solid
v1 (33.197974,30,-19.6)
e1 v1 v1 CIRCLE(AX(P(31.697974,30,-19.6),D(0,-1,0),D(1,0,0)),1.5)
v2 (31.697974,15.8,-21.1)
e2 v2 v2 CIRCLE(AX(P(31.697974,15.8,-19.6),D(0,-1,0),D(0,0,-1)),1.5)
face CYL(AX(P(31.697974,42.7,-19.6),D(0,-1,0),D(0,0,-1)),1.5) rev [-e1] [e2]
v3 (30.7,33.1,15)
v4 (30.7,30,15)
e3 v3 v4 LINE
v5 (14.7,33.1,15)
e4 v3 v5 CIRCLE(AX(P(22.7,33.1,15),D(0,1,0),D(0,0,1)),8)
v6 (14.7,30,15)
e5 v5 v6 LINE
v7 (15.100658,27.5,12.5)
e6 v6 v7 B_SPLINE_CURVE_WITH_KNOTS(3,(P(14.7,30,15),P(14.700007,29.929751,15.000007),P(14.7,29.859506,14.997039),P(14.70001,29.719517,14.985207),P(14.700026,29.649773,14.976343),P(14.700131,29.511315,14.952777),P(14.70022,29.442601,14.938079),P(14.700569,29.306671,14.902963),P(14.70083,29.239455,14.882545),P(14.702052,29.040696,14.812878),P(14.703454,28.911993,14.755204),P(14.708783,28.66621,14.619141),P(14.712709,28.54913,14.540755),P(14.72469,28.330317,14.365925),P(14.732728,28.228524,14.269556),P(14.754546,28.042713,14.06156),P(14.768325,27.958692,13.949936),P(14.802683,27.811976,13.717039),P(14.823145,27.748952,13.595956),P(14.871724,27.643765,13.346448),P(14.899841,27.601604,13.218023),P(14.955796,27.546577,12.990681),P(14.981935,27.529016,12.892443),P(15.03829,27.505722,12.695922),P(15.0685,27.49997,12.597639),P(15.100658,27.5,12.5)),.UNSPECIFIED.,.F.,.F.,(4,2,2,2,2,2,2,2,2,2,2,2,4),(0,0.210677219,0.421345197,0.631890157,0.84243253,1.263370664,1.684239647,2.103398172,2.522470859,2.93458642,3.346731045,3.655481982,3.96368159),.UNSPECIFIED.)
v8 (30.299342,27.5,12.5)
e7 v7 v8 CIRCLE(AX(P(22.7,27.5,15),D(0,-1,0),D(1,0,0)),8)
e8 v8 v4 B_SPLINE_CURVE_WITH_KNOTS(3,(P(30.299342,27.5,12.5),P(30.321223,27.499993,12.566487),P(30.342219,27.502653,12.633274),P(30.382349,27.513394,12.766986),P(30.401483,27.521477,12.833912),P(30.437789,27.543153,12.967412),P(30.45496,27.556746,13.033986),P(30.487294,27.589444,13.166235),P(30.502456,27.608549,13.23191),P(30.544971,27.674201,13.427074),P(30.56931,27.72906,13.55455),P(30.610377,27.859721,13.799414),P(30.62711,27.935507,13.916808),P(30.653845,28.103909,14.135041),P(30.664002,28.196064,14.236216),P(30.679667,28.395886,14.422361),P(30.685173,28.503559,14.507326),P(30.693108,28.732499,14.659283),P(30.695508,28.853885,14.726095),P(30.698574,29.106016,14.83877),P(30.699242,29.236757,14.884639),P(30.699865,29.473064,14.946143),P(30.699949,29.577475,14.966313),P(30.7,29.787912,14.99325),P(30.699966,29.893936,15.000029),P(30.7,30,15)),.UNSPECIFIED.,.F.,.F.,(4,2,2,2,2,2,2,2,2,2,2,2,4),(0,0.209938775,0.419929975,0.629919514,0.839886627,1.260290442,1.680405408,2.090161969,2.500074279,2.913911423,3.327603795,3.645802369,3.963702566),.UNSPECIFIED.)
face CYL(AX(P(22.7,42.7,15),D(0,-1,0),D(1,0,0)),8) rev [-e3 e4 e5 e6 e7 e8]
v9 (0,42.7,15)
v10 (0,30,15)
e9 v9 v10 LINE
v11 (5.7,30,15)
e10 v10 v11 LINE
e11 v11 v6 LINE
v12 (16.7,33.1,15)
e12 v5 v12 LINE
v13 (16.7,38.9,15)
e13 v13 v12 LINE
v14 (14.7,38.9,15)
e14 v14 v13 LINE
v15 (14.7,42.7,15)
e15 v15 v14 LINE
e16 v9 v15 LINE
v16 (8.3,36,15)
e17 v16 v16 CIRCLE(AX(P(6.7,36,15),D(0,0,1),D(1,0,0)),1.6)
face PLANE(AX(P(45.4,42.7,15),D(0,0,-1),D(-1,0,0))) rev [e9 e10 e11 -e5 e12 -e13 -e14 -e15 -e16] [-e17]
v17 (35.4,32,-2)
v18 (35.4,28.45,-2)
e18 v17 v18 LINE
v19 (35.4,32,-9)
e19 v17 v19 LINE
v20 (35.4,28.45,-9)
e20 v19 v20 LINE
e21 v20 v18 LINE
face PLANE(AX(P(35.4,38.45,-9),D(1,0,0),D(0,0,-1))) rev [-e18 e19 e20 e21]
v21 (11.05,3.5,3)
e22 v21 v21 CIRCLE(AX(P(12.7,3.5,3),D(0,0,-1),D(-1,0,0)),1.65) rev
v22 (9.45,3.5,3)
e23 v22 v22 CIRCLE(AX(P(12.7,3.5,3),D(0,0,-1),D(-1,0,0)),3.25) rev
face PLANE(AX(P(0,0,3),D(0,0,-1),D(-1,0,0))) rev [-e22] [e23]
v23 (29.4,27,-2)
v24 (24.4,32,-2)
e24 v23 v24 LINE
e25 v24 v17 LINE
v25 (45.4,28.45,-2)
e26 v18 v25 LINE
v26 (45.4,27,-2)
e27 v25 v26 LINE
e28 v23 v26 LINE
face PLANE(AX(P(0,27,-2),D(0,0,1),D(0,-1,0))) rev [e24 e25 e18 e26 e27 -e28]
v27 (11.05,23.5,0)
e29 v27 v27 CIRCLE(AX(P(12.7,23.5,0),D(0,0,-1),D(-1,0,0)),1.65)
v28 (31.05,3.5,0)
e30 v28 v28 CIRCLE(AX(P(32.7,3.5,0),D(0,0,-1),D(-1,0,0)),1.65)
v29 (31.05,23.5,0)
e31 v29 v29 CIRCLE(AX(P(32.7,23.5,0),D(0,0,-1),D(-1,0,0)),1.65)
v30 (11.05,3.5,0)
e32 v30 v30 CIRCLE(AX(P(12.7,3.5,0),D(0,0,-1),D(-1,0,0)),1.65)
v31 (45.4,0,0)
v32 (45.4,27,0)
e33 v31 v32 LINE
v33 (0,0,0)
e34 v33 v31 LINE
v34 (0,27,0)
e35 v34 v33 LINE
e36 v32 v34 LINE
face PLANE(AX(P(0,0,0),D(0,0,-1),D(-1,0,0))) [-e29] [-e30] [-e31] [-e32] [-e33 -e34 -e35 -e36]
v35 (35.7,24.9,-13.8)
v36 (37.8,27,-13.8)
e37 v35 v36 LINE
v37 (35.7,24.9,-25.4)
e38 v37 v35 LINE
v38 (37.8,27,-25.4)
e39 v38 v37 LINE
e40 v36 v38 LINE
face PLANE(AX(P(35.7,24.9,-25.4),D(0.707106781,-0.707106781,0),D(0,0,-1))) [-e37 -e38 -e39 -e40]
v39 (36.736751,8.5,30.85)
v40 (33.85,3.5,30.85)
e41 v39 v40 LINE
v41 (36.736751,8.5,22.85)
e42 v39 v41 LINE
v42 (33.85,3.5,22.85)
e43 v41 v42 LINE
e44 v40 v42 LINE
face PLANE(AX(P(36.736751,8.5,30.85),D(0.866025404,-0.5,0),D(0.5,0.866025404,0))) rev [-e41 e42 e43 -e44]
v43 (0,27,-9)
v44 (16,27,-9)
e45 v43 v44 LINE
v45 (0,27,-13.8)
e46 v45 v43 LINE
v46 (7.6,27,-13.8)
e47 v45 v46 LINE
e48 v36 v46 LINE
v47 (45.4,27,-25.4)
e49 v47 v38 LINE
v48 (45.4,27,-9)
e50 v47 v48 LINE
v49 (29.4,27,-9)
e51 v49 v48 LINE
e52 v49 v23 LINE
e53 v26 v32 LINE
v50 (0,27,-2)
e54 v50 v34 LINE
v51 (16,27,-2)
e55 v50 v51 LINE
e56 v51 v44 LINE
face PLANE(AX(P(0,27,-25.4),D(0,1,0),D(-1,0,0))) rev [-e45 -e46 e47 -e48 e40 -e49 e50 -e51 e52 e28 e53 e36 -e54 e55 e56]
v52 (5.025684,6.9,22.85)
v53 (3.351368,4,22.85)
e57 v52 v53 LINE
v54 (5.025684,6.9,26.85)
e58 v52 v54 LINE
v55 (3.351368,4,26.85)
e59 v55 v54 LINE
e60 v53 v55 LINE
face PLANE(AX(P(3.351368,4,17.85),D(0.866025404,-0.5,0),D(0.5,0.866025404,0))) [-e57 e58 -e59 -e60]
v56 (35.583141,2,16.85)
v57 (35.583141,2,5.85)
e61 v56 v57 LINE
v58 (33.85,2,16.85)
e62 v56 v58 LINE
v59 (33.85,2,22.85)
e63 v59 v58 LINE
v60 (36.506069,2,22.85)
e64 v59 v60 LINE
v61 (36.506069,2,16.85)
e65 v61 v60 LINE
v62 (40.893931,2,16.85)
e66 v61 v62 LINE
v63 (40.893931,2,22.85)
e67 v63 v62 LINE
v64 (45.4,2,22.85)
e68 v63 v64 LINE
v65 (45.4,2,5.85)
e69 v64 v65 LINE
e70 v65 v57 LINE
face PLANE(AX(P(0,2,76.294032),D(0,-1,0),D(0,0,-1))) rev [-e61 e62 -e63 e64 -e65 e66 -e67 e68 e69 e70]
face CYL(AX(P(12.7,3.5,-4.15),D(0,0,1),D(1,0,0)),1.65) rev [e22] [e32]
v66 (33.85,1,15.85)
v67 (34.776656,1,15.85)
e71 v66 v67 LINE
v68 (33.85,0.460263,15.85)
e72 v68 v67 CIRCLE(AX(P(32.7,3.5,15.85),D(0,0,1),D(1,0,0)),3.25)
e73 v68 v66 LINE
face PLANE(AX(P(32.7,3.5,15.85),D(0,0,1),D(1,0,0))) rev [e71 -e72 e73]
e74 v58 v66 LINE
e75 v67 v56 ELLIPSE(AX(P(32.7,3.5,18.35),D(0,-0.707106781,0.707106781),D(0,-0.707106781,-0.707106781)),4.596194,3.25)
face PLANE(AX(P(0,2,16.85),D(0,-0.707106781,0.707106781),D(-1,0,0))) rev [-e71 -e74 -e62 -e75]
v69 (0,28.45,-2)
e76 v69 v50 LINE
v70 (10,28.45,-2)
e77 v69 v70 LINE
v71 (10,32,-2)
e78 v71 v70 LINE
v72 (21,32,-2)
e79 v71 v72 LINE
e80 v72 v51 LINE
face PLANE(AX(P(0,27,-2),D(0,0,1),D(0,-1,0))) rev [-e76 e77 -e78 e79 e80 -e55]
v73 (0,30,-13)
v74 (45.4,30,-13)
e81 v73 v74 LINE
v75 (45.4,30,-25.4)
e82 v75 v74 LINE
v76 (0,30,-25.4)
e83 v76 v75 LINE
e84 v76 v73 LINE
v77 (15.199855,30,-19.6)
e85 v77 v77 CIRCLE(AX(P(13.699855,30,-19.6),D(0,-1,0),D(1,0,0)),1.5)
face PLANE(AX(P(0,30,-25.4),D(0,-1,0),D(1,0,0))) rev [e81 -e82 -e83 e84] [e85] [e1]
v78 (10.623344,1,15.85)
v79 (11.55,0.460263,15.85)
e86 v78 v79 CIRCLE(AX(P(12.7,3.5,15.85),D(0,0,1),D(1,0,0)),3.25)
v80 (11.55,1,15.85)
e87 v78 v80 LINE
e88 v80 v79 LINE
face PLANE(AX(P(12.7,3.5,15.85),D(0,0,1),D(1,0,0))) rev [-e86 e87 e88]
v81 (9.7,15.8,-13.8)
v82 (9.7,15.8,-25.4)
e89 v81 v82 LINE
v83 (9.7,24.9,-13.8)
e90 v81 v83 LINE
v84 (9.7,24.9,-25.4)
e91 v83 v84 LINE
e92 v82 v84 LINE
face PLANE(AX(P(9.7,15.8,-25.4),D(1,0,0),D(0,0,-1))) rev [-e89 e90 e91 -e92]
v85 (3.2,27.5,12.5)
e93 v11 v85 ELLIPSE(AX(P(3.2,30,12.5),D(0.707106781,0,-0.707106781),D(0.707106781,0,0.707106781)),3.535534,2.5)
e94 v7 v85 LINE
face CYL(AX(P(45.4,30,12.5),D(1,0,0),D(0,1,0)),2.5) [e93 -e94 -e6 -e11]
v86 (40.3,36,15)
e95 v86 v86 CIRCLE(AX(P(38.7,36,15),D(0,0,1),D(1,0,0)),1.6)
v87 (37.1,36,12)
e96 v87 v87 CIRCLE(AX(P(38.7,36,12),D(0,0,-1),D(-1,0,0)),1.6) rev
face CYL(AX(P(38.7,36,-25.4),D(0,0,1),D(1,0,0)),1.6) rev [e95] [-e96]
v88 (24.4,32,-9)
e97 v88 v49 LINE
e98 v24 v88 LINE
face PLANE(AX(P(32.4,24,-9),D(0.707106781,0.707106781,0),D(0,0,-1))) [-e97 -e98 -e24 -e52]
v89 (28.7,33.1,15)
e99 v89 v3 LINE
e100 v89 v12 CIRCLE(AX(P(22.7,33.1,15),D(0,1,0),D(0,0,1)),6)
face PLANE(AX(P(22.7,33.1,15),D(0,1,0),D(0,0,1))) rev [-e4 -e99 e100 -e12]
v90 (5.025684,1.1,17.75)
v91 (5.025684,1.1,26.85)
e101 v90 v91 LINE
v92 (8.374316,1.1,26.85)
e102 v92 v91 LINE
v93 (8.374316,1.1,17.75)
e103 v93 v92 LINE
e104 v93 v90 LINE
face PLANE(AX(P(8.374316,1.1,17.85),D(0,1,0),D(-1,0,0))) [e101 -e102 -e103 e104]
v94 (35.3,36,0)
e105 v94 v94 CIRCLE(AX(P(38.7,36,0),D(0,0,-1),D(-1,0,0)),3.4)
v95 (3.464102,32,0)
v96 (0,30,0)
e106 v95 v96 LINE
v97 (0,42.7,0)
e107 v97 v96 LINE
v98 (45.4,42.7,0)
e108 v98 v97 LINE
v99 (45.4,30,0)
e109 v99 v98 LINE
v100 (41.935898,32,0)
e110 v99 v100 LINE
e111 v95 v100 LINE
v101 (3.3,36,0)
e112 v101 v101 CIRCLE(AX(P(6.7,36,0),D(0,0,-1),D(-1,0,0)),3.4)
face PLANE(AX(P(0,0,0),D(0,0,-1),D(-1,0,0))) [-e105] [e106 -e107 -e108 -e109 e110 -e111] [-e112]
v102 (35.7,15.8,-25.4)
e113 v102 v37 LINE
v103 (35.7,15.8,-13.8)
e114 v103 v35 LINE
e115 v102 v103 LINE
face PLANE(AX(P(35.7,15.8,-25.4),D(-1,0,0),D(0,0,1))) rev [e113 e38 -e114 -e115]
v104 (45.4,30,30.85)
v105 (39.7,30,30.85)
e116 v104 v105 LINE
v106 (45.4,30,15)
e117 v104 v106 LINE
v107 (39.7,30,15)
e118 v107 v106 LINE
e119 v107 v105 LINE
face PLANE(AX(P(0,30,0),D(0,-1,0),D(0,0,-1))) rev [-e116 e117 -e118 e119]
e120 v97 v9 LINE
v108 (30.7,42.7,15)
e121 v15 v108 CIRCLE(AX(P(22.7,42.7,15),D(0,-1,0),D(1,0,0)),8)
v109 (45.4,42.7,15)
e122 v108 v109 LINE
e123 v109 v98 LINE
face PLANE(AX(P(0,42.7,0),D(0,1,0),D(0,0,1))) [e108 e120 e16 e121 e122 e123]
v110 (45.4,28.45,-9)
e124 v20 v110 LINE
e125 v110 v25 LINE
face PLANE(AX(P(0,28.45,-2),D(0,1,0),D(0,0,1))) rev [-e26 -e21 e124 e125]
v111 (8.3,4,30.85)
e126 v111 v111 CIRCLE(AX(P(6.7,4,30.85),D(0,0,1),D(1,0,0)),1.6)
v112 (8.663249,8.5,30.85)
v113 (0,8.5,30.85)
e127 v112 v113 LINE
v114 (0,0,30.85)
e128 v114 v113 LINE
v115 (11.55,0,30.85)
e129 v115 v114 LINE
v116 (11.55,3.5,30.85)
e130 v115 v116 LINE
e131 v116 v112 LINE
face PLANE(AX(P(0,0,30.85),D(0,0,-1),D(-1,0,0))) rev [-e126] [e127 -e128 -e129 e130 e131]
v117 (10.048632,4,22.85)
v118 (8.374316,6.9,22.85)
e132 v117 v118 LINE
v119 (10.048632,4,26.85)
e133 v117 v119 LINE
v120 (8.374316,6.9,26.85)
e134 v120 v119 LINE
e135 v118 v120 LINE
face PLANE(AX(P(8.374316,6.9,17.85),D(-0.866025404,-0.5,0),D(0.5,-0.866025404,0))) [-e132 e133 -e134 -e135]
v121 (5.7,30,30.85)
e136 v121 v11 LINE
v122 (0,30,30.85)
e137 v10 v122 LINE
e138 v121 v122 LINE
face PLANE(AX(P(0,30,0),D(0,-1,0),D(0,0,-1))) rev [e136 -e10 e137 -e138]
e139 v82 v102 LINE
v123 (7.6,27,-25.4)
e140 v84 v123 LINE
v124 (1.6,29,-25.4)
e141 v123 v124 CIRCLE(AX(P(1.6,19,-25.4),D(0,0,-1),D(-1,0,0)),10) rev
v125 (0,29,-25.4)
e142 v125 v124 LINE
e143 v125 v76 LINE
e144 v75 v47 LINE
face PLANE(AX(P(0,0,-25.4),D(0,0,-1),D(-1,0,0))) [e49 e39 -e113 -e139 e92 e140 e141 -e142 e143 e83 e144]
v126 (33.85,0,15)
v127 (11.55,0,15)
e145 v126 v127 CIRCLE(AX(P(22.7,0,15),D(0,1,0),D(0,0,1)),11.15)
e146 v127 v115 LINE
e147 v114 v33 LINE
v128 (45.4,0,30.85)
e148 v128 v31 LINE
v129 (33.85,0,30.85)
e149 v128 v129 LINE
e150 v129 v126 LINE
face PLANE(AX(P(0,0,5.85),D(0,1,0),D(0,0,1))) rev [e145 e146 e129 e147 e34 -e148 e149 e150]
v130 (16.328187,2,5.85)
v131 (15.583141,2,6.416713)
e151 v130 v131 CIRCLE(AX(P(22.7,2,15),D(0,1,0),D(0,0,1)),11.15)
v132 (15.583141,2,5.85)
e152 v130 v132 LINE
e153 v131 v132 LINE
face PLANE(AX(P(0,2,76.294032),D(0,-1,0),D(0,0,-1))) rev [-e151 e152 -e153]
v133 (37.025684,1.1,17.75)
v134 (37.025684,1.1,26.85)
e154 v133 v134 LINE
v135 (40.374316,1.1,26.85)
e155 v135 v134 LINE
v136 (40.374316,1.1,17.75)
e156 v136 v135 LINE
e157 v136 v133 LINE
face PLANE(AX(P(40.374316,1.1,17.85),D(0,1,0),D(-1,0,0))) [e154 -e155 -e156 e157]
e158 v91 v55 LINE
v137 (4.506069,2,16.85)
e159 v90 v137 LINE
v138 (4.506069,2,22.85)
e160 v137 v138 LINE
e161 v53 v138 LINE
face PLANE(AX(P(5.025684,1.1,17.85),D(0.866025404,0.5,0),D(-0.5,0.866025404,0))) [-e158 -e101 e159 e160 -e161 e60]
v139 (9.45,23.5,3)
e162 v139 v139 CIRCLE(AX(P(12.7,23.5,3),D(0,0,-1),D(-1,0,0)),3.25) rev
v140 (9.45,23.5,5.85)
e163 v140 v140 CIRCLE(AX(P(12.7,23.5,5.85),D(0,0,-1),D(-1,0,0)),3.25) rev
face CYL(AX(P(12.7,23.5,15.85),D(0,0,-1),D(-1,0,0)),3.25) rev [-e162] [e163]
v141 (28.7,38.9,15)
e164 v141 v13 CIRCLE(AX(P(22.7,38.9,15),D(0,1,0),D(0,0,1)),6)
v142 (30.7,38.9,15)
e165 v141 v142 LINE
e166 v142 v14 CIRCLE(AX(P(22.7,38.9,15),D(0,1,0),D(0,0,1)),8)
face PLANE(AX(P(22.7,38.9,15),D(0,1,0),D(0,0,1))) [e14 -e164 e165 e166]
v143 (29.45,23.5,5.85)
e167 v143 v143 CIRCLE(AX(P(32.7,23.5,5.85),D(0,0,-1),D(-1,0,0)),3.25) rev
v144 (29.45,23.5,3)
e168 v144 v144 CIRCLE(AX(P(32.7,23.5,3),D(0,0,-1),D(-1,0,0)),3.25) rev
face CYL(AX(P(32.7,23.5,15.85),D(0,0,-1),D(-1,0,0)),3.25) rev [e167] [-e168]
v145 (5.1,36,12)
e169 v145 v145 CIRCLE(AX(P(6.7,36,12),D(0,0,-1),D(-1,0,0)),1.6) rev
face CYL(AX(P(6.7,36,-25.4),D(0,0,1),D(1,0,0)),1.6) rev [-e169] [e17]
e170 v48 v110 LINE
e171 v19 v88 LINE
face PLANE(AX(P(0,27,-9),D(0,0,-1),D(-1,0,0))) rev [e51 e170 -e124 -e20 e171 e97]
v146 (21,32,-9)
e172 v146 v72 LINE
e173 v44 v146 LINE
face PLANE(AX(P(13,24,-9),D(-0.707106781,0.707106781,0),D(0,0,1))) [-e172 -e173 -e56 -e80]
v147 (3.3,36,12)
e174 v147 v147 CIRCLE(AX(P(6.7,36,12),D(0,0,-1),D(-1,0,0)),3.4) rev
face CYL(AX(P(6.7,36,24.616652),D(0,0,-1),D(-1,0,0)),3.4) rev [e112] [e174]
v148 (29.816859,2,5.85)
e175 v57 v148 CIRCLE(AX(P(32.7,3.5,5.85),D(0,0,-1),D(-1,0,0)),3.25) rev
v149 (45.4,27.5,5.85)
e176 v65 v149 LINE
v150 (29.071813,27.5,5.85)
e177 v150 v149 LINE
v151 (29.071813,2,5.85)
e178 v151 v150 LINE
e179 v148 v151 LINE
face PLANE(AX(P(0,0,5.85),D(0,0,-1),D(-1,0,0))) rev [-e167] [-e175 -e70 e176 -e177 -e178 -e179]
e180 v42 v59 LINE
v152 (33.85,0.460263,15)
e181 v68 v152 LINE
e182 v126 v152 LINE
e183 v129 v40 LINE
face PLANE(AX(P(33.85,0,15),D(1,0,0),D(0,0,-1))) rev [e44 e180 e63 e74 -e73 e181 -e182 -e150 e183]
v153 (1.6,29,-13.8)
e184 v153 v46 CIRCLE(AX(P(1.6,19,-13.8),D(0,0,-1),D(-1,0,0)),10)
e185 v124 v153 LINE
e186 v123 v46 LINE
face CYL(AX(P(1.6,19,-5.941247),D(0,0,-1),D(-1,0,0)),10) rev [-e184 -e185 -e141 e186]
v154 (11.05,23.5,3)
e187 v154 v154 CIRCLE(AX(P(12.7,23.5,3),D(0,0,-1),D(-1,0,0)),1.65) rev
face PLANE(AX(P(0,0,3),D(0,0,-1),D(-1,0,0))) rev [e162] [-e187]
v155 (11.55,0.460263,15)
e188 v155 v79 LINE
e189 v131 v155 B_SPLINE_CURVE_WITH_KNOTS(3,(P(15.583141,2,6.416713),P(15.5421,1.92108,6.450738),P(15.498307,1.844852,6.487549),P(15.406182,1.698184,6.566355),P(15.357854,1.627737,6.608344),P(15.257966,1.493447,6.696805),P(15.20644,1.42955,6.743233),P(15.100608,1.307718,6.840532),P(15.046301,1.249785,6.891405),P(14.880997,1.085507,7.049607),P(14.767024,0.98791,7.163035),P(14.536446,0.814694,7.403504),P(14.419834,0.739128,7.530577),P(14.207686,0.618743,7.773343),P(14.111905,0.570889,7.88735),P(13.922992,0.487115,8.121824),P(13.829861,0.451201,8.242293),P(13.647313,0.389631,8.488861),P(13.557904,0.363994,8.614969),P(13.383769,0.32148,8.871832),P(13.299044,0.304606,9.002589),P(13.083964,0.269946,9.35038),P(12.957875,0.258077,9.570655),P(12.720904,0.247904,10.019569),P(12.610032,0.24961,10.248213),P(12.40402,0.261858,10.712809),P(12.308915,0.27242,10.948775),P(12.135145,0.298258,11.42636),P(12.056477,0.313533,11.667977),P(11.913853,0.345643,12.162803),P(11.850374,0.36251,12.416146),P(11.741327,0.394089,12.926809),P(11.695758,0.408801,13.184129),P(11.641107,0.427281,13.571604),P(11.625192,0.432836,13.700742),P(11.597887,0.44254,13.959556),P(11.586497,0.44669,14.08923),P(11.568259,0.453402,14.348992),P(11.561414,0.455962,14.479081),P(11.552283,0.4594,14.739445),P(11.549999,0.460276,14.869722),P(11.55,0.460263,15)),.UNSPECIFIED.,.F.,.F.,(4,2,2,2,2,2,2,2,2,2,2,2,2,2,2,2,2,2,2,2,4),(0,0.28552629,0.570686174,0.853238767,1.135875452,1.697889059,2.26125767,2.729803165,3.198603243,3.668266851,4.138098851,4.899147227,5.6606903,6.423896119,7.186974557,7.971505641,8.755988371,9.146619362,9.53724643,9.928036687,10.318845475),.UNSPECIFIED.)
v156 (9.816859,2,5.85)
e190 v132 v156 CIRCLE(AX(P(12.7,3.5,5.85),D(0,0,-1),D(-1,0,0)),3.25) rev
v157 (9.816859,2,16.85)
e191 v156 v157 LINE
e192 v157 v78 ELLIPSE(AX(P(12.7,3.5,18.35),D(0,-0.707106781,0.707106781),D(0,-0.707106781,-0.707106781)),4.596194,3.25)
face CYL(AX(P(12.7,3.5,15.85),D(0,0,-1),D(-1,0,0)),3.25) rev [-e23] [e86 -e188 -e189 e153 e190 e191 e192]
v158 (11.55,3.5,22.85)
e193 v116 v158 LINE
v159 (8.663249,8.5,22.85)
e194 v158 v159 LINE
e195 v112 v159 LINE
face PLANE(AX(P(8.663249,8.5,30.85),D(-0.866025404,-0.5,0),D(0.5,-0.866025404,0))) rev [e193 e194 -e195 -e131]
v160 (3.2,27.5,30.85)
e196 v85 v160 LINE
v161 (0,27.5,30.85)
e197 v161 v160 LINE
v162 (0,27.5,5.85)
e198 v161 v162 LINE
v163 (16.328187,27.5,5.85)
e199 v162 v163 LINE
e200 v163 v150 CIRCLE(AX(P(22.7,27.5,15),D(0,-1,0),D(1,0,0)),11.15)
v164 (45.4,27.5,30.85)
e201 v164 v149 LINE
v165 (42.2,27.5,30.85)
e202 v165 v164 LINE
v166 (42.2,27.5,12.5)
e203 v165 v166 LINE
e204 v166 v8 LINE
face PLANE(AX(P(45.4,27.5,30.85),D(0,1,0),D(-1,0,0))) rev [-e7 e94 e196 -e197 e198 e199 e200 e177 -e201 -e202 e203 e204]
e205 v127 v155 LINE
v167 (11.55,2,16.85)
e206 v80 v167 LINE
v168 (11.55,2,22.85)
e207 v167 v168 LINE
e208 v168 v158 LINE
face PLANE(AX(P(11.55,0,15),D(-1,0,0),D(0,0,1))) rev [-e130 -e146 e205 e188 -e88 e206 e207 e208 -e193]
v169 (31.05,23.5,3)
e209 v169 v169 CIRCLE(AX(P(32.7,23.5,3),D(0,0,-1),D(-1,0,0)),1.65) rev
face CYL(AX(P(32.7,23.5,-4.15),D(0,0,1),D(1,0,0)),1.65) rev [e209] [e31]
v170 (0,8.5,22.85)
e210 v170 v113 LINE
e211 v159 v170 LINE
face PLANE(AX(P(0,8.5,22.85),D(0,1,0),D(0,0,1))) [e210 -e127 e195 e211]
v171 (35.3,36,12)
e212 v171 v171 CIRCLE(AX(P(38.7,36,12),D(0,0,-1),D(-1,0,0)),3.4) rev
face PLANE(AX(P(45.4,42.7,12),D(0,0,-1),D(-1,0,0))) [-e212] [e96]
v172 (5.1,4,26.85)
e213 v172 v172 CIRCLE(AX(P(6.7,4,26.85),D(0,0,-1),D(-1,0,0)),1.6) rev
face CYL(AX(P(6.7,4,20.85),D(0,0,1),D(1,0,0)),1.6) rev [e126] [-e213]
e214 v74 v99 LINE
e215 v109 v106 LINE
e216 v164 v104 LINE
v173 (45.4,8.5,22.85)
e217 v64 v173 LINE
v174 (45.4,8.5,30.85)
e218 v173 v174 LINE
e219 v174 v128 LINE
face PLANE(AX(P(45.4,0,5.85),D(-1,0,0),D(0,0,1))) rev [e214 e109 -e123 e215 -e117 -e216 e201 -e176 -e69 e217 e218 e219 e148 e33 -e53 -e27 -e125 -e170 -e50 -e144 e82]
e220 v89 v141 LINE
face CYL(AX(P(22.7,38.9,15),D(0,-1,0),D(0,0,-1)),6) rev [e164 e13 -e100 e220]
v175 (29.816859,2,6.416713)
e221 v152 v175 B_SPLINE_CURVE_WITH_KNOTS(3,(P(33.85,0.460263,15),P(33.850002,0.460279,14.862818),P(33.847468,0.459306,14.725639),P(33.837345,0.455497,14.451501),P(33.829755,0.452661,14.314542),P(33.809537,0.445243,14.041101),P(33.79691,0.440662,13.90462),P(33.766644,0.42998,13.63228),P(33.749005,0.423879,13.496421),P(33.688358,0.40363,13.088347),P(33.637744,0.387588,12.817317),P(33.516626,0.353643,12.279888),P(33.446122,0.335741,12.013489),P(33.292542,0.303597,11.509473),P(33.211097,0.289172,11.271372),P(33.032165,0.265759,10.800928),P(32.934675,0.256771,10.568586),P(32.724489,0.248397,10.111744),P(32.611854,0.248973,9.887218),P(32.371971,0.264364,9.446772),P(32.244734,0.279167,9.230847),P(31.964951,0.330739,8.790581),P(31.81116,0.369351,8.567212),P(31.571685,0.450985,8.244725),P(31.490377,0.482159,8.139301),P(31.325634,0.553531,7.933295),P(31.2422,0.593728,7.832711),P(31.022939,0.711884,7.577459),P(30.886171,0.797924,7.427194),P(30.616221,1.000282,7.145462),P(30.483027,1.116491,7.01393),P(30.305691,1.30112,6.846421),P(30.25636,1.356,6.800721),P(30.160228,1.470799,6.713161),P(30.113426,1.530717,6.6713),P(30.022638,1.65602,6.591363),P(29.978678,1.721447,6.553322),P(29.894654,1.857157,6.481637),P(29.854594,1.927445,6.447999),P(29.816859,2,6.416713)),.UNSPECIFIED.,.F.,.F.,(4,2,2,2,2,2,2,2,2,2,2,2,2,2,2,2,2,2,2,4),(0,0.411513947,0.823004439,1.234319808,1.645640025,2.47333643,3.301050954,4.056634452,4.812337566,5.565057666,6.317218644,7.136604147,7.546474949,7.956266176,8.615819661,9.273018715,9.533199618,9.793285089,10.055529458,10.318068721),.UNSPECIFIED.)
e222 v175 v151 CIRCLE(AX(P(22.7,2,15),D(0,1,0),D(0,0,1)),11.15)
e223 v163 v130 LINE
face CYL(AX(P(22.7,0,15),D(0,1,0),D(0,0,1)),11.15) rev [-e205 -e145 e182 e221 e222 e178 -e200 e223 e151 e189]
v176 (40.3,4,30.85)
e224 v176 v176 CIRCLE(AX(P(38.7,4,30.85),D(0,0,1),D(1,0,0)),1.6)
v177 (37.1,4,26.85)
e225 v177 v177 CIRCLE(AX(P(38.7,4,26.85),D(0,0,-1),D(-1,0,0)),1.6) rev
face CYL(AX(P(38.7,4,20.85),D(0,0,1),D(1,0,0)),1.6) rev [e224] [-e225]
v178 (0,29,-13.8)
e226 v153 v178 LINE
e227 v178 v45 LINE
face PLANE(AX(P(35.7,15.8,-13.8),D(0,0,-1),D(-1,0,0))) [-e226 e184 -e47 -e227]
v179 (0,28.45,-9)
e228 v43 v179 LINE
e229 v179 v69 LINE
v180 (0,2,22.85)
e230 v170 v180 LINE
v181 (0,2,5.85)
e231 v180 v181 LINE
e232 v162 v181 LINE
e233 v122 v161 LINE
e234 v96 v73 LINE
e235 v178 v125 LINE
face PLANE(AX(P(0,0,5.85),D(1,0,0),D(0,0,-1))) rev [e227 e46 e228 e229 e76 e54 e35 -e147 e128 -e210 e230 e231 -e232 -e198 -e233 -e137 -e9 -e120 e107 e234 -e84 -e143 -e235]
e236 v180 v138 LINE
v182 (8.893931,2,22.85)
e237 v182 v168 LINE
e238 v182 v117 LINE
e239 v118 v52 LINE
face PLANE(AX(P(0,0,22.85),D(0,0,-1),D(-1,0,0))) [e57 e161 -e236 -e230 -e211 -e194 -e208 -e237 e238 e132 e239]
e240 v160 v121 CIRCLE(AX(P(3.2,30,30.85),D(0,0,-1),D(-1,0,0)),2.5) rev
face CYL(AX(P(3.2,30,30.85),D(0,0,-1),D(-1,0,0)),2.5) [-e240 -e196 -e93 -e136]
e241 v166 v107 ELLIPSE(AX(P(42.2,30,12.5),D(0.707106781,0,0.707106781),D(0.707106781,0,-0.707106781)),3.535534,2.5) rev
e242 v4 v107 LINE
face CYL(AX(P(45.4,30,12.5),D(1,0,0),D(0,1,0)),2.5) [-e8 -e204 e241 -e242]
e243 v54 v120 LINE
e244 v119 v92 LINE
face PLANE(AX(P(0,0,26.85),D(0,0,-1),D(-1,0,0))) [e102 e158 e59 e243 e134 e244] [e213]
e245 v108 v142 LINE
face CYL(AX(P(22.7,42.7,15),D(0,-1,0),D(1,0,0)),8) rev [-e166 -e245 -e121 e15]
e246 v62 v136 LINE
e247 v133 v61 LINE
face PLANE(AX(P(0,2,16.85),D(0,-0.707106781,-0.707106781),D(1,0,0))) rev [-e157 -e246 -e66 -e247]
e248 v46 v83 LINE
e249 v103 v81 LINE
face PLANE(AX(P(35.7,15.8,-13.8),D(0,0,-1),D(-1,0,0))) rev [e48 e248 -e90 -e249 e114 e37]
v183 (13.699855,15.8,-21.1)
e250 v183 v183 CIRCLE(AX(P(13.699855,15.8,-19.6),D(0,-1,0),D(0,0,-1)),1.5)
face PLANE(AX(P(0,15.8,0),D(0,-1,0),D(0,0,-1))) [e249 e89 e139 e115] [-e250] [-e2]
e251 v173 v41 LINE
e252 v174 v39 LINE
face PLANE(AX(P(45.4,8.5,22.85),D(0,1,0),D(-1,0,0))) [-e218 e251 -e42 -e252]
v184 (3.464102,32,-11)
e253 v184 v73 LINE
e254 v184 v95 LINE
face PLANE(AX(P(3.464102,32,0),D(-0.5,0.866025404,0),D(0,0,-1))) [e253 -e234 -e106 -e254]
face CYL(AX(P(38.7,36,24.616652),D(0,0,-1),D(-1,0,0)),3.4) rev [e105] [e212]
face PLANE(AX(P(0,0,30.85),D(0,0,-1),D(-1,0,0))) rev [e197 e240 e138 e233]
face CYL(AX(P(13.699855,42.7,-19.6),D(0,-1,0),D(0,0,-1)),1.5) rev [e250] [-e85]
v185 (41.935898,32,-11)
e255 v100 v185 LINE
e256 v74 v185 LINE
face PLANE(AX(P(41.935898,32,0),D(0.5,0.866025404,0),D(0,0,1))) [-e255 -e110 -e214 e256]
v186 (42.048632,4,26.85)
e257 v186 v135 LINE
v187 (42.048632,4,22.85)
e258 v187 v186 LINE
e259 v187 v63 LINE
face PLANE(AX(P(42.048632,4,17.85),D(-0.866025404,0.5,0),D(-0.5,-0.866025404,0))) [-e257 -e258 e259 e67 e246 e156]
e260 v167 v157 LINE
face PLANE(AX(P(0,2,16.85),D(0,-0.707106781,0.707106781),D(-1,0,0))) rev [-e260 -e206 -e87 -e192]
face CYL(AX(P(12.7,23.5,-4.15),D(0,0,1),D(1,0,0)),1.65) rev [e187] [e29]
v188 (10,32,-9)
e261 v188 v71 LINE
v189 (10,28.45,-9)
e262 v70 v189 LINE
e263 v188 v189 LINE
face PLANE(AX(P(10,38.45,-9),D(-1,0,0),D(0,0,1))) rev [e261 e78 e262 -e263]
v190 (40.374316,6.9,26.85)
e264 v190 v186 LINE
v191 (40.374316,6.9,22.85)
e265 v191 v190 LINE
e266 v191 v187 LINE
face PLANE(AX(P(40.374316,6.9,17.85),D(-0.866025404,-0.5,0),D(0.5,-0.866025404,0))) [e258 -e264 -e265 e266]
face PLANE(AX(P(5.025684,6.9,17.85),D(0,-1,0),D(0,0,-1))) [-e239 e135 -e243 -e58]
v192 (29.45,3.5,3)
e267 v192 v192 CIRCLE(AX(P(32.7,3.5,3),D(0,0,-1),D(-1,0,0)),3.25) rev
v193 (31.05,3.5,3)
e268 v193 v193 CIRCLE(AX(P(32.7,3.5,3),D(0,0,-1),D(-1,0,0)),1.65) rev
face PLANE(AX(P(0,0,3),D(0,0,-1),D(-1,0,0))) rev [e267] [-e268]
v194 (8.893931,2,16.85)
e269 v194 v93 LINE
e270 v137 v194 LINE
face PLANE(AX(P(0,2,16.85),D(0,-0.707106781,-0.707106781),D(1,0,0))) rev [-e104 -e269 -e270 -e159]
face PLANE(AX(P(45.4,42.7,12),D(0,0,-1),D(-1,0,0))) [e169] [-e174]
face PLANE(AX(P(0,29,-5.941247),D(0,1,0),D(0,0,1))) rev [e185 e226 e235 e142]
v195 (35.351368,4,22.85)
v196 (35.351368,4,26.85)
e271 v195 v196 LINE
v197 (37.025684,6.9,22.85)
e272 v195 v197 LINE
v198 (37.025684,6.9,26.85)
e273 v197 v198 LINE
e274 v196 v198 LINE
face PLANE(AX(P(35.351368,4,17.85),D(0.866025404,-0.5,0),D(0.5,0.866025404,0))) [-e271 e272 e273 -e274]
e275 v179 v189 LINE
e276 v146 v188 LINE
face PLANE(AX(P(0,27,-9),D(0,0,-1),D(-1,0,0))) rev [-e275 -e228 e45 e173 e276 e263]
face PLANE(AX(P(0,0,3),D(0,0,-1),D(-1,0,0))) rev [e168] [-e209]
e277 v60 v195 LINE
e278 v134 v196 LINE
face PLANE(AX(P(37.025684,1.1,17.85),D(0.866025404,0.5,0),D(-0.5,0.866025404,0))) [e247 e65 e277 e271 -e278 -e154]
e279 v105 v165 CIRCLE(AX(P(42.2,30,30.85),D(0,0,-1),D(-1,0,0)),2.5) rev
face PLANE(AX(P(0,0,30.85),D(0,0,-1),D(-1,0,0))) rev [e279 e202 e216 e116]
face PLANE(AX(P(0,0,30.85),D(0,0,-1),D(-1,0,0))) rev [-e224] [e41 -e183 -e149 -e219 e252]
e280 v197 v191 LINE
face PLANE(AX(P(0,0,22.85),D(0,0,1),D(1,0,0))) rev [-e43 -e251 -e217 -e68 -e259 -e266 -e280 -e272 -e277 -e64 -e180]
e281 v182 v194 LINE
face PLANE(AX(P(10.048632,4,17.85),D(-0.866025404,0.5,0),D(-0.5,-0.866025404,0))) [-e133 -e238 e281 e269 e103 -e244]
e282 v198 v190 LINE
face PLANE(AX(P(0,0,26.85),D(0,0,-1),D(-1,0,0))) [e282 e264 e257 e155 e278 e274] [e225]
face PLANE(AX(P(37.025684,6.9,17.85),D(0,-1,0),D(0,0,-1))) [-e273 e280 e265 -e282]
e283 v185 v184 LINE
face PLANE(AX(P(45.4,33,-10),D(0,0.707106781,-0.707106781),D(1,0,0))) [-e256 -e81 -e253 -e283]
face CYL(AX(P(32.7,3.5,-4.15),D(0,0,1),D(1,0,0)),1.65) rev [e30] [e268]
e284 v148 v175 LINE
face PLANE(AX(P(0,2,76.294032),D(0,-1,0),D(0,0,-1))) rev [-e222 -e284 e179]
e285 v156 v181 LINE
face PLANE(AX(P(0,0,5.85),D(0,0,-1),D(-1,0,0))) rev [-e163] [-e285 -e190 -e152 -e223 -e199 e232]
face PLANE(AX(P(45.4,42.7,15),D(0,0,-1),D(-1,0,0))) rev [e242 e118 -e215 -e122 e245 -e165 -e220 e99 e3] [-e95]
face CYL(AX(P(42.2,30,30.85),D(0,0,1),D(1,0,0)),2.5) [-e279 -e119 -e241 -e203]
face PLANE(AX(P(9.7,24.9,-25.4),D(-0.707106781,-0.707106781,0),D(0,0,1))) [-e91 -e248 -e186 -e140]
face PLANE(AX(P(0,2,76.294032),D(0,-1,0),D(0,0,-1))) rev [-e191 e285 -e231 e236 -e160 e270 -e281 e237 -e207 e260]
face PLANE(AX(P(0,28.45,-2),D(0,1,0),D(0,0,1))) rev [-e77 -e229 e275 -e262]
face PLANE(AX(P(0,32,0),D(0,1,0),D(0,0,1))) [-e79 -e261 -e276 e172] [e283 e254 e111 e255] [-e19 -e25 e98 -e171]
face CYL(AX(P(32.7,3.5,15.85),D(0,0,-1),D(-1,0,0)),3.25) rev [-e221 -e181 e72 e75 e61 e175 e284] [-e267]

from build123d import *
from OCP.BRepFilletAPI import BRepFilletAPI_MakeChamfer

# Parameters (mm, degrees)
SKETCH1_W                = 45.4
SKETCH1_H                = 27
BOSS_EXTRUDE1_DEPTH      = 5.85
SKETCH3_W                = 45.4
SKETCH3_H                = 5.85
BOSS_EXTRUDE2_DEPTH      = 3
SKETCH4_W                = 45.4
SKETCH4_H                = 2.5
BOSS_EXTRUDE3_DEPTH      = 25
SKETCH6_W                = 45.4
SKETCH6_H                = 2
BOSS_EXTRUDE5_DEPTH      = 25
SKETCH7_R                = 1.65
CUT_EXTRUDE1_DEPTH       = 10
CUT_EXTRUDE2_DEPTH       = 10
CUT_EXTRUDE2_DEPTH_BACK  = 2.85
SKETCH8_R                = 3.25
SKETCH37_W               = 45.4
SKETCH37_H               = 15
BOSS_EXTRUDE16_DEPTH     = 12.7
CUT_EXTRUDE3_DEPTH       = 69.332806909
CUT_EXTRUDE4_DEPTH       = 62.393261076
SKETCH18_W               = 45.4
SKETCH18_H               = 3
BOSS_EXTRUDE8_DEPTH      = 25.4
SKETCH19_W               = 26
SKETCH19_H               = 11.6
BOSS_EXTRUDE9_DEPTH      = 11.2
SKETCH20_R               = 1.5
CUT_EXTRUDE9_DEPTH       = 62.1268558
SKETCH21_W               = 45.4
SKETCH21_H               = 10
BOSS_EXTRUDE10_DEPTH     = 2
SKETCH22_W               = 7
SKETCH22_H               = 1.45
CUT_EXTRUDE10_DEPTH      = 70.542594861
SKETCH23_W               = 3
SKETCH23_H               = 7
CUT_EXTRUDE11_DEPTH      = 10
SKETCH24_W               = 19.4
SKETCH24_H               = 7
BOSS_EXTRUDE11_DEPTH     = 1.45
CHAMFER2_SIZE            = 2
CHAMFER2_SIZE2           = 3.464101615
CHAMFER3_SIZE            = 3
CHAMFER4_SIZE            = 2.1
SKETCH35_W               = 7.6
SKETCH35_H               = 2
CUT_EXTRUDE14_DEPTH      = 11.6
FILLET8_R                = 10
SKETCH36_R               = 11.15
CUT_EXTRUDE15_DEPTH      = 25.5
SKETCH39_R               = 8
SKETCH39_R_2             = 6
BOSS_EXTRUDE17_DEPTH     = 5.8
SKETCH40_W               = 45.4
SKETCH40_H               = 10
CUT_EXTRUDE16_DEPTH      = 63.553037544
SKETCH41_R               = 1.6
CUT_EXTRUDE17_DEPTH      = 75.273885047
SKETCH42_R               = 3.4
CUT_EXTRUDE18_DEPTH      = 12
SKETCH43_W               = 11.55
SKETCH43_H               = 6.5
BOSS_EXTRUDE18_DEPTH     = 8
SKETCH44_R               = 1.6
CUT_EXTRUDE19_DEPTH      = 10
CUT_EXTRUDE20_DEPTH      = 5
CUT_EXTRUDE20_DEPTH_BACK = 4
CUT_EXTRUDE21_DEPTH      = 79.819493147
SKETCH47_W               = 9
SKETCH47_H               = 15.85
CUT_EXTRUDE22_DEPTH      = 4
FILLET11_R               = 2.5
CHAMFER7_SIZE            = 1


# Some blends are built 0.0001 mm under size
with BuildPart() as part:
    # Sketch1 → Boss-Extrude1 (new body)
    with BuildSketch(Plane.XY):
        with Locations((22.7, 13.5)):
            Rectangle(SKETCH1_W, SKETCH1_H)
    extrude(amount=BOSS_EXTRUDE1_DEPTH)

    # Sketch3 → Boss-Extrude2 (add)
    with BuildSketch(Plane(origin=(0, 27, 0), x_dir=(1, 0, 0), z_dir=(0, 1, 0))):
        with Locations((22.7, -2.925)):
            Rectangle(SKETCH3_W, SKETCH3_H)
    extrude(amount=BOSS_EXTRUDE2_DEPTH)

    # Sketch4 → Boss-Extrude3 (add)
    with BuildSketch(Plane.XY.offset(5.85)):
        with Locations((22.7, 28.75)):
            Rectangle(SKETCH4_W, SKETCH4_H)
    extrude(amount=BOSS_EXTRUDE3_DEPTH)

    # Sketch6 → Boss-Extrude5 (add)
    with BuildSketch(Plane.XY.offset(5.85)):
        with Locations((22.7, 1)):
            Rectangle(SKETCH6_W, SKETCH6_H)
    extrude(amount=BOSS_EXTRUDE5_DEPTH)

    # Sketch7 → Cut-Extrude1 (cut)
    with BuildSketch(Plane.XY.offset(5.85)):
        with Locations((12.7, 23.5)):
            Circle(SKETCH7_R)
        with Locations((32.7, 23.5)):
            Circle(SKETCH7_R)
        with Locations(Location((32.7, 3.5, 0), (0, 0, 294.619977329))):
            Circle(SKETCH7_R)
        with Locations(Location((12.7, 3.5, 0), (0, 0, 294.619977329))):
            Circle(SKETCH7_R)
    extrude(amount=-CUT_EXTRUDE1_DEPTH, mode=Mode.SUBTRACT)

    # Sketch8 → Cut-Extrude2 (cut, two sides: drawn at the far end of the back side and taken through both)
    with BuildSketch(Plane.XY.offset(5.85).offset(-CUT_EXTRUDE2_DEPTH_BACK)):
        with Locations(Location((12.7, 23.5, 0), (0, 0, 180))):
            Circle(SKETCH8_R)
        with Locations(Location((32.7, 23.5, 0), (0, 0, 180))):
            Circle(SKETCH8_R)
        with Locations(Location((32.7, 3.5, 0), (0, 0, 180))):
            Circle(SKETCH8_R)
        with Locations(Location((12.7, 3.5, 0), (0, 0, 180))):
            Circle(SKETCH8_R)
    extrude(amount=CUT_EXTRUDE2_DEPTH + CUT_EXTRUDE2_DEPTH_BACK, mode=Mode.SUBTRACT)

    # Sketch37 → Boss-Extrude16 (add)
    with BuildSketch(Plane(origin=(0, 30, 0), x_dir=(1, 0, 0), z_dir=(0, 1, 0))):
        with Locations((22.7, -7.5)):
            Rectangle(SKETCH37_W, SKETCH37_H)
    extrude(amount=BOSS_EXTRUDE16_DEPTH)

    # Sketch9 → Cut-Extrude3 (cut, through all)
    with BuildSketch(Plane(origin=(0, 2, 0), x_dir=(1, 0, 0), z_dir=(0, 1, 0))):
        with BuildLine():
            Line((11.55, -15), (11.55, -30.85))
            Line((11.55, -30.85), (33.85, -30.85))
            Line((33.85, -30.85), (33.85, -15))
            ThreePointArc((33.85, -15), (22.7, -3.85), (11.55, -15))
        make_face()
    extrude(amount=-CUT_EXTRUDE3_DEPTH, mode=Mode.SUBTRACT)

    # Sketch10 → Cut-Extrude4 (cut, through all)
    with BuildSketch(Plane.XZ.offset(-27.5)):
        with BuildLine():
            Line((14.7, 15), (14.7, 30.85))
            Line((14.7, 30.85), (30.7, 30.85))
            Line((30.7, 30.85), (30.7, 15))
            ThreePointArc((30.7, 15), (22.7, 7), (14.7, 15))
        make_face()
    extrude(amount=-CUT_EXTRUDE4_DEPTH, mode=Mode.SUBTRACT)

    # Sketch18 → Boss-Extrude8 (add)
    with BuildSketch(Plane(origin=(0, 0, 0), x_dir=(-1, 0, 0), z_dir=(0, 0, -1))):
        with Locations((-22.7, 28.5)):
            Rectangle(SKETCH18_W, SKETCH18_H)
    extrude(amount=BOSS_EXTRUDE8_DEPTH)

    # Sketch19 → Boss-Extrude9 (add)
    with BuildSketch(Plane.XZ.offset(-27)):
        with Locations((22.7, -19.6)):
            Rectangle(SKETCH19_W, SKETCH19_H)
    extrude(amount=BOSS_EXTRUDE9_DEPTH)

    # Sketch20 → Cut-Extrude9 (cut, through all)
    with BuildSketch(Plane.XZ.offset(-15.8)):
        with Locations(Location((31.697973531, -19.6, 0), (0, 0, 270))):
            Circle(SKETCH20_R)
        with Locations(Location((13.699854881, -19.6, 0), (0, 0, 270))):
            Circle(SKETCH20_R)
    extrude(amount=-CUT_EXTRUDE9_DEPTH, mode=Mode.SUBTRACT)

    # Sketch21 → Boss-Extrude10 (add)
    with BuildSketch(Plane(origin=(0, 30, 0), x_dir=(1, 0, 0), z_dir=(0, 1, 0))):
        with Locations((22.7, 5)):
            Rectangle(SKETCH21_W, SKETCH21_H)
    extrude(amount=BOSS_EXTRUDE10_DEPTH)

    # Sketch22 → Cut-Extrude10 (cut, through all)
    with BuildSketch(Plane(origin=(45.4, 0, 0), x_dir=(0, 0, -1), z_dir=(1, 0, 0))):
        with Locations((5.5, 27.725)):
            Rectangle(SKETCH22_W, SKETCH22_H)
    extrude(amount=-CUT_EXTRUDE10_DEPTH, mode=Mode.SUBTRACT)

    # Sketch23 → Cut-Extrude11 (cut)
    with BuildSketch(Plane.XZ.offset(-28.45)):
        with Locations((11.5, -5.5)):
            Rectangle(SKETCH23_W, SKETCH23_H)
        with Locations((33.9, -5.5)):
            Rectangle(SKETCH23_W, SKETCH23_H)
    extrude(amount=-CUT_EXTRUDE11_DEPTH, mode=Mode.SUBTRACT)

    # Sketch24 → Boss-Extrude11 (add)
    with BuildSketch(Plane.XZ.offset(-28.45)):
        with Locations((22.7, -5.5)):
            Rectangle(SKETCH24_W, SKETCH24_H)
    extrude(amount=BOSS_EXTRUDE11_DEPTH)

    # Chamfer1
    # the kernel refuses this chamfer: 8 mm, written as the material it takes off along each edge
    with BuildSketch(Plane(origin=(32.4, 32, -2), x_dir=(-1, 0, 0), z_dir=(0, 0, -1)), Plane(origin=(13, 32, -9), x_dir=(1, 0, 0), z_dir=(0, 0, 1))) as chamfer1_piece_1:
        with BuildLine():
            Line((8.22627417, 0.22627417), (-0.22627417, -8.22627417))
            Line((-0.22627417, -8.22627417), (-0.38627417, -8.22627417))
            ThreePointArc((-0.38627417, -8.22627417), (-0.16, -4.113137085), (-0.16, 0))
            Line((-0.16, 0), (0, 0.16))
            ThreePointArc((0, 0.16), (4.113137085, 0.16), (8.22627417, 0.38627417))
            Line((8.22627417, 0.38627417), (8.22627417, 0.22627417))
        make_face()
    extrude(amount=7, mode=Mode.SUBTRACT)

    # Chamfer2: one chamfer whose edges measure the first distance from different faces: ONE call of the kernel's chamfer builder (chamfer() names one face for all edges)
    chamfer2_edges_1 = [part.edges().sort_by_distance(p)[0] for p in [
        (45.4, 32, -5),
    ]]
    chamfer2_side_1 = [part.faces().sort_by_distance(p)[0] for p in [
        (45.4, 24.646782836, 5.304308741),
    ]]
    chamfer2_edges_2 = [part.edges().sort_by_distance(p)[0] for p in [
        (0, 32, -5),
    ]]
    chamfer2_side_2 = [part.faces().sort_by_distance(p)[0] for p in [
        (0, 24.646782836, 5.304308741),
    ]]
    chamfer2 = BRepFilletAPI_MakeChamfer(part.part.solid().wrapped)
    for e in chamfer2_edges_1:
        chamfer2.Add(CHAMFER2_SIZE, CHAMFER2_SIZE2, e.wrapped, chamfer2_side_1[0].wrapped)  # the first distance lies on this face
    for e in chamfer2_edges_2:
        chamfer2.Add(CHAMFER2_SIZE, CHAMFER2_SIZE2, e.wrapped, chamfer2_side_2[0].wrapped)  # the first distance lies on this face
    add(Compound.cast(chamfer2.Shape()), mode=Mode.REPLACE)

    # Chamfer3
    # the kernel refuses this chamfer: 3 mm, written as the material it adds along each edge
    with BuildSketch(Plane(origin=(0, 30, -10), x_dir=(0, 1, 0), z_dir=(1, 0, 0))) as chamfer3_piece_1_section:
        Polygon((CHAMFER3_SIZE, 0), (0, -CHAMFER3_SIZE), (0, 0), align=None)
    chamfer3_piece_1 = extrude(amount=45.4, mode=Mode.PRIVATE)
    chamfer3_piece_1 = split(chamfer3_piece_1, bisect_by=Plane(origin=(0, 30, -10), z_dir=(0.49999999999999795, -0.8660254037844398, 0)), keep=Keep.TOP, mode=Mode.PRIVATE)
    chamfer3_piece_1 = split(chamfer3_piece_1, bisect_by=Plane(origin=(0, 32, -10), z_dir=(0, -1, 0)), keep=Keep.TOP, mode=Mode.PRIVATE)
    chamfer3_piece_1 = split(chamfer3_piece_1, bisect_by=Plane(origin=(11.35, 49.658776666, -10), z_dir=(-0.4999999999999982, -0.8660254037844397, 0)), keep=Keep.TOP, mode=Mode.PRIVATE)
    add(chamfer3_piece_1)

    # Chamfer4
    chamfer4_edges = [part.edges().sort_by_distance(p)[0] for p in [
        (35.7, 27, -19.6),
        (9.7, 27, -19.6),
    ]]
    chamfer(chamfer4_edges, length=CHAMFER4_SIZE)

    # Sketch35 → Cut-Extrude14 (cut)
    with BuildSketch(Plane(origin=(0, 0, -25.4), x_dir=(-1, 0, 0), z_dir=(0, 0, -1))):
        with Locations((-3.8, 28)):
            Rectangle(SKETCH35_W, SKETCH35_H)
    extrude(amount=-CUT_EXTRUDE14_DEPTH, mode=Mode.SUBTRACT)

    # Fillet8
    # the kernel refuses this fillet: 10 mm, written as the material it adds along each edge
    with BuildSketch(Plane(origin=(7.6, 29, -25.4), x_dir=(-1, 0, 0), z_dir=(0, 0, 1))) as fillet8_piece_1:
        with BuildLine():
            CenterArc((6, 10), FILLET8_R, 233.130102354, 36.869897646)
            Line((0, 2), (0, 0))
            Line((0, 0), (6, 0))
        make_face()
    extrude(amount=11.6)

    # Sketch36 → Cut-Extrude15 (cut)
    with BuildSketch(Plane.XZ.offset(-27.5)):
        with Locations((22.7, 15)):
            Circle(SKETCH36_R)
    extrude(amount=CUT_EXTRUDE15_DEPTH, mode=Mode.SUBTRACT)

    # Sketch39 → Boss-Extrude17 (add)
    with BuildSketch(Plane(origin=(0, 33.1, 0), x_dir=(1, 0, 0), z_dir=(0, 1, 0))):
        with Locations((22.7, -15)):
            Circle(SKETCH39_R)
        with Locations(Location((22.7, -15, 0), (0, 0, 270))):
            Circle(SKETCH39_R_2, mode=Mode.SUBTRACT)
    extrude(amount=BOSS_EXTRUDE17_DEPTH)

    # Sketch40 → Cut-Extrude16 (cut, through all)
    with BuildSketch(Plane(origin=(0, 30, 0), x_dir=(1, 0, 0), z_dir=(0, 1, 0))):
        with Locations((22.7, -20)):
            Rectangle(SKETCH40_W, SKETCH40_H)
    extrude(amount=CUT_EXTRUDE16_DEPTH, mode=Mode.SUBTRACT)

    # Sketch41 → Cut-Extrude17 (cut, through all)
    with BuildSketch(Plane.XY.offset(15)):
        with Locations((6.7, 36)):
            Circle(SKETCH41_R)
        with Locations((38.7, 36)):
            Circle(SKETCH41_R)
    extrude(amount=-CUT_EXTRUDE17_DEPTH, mode=Mode.SUBTRACT)

    # Sketch42 → Cut-Extrude18 (cut)
    with BuildSketch(Plane(origin=(0, 0, 0), x_dir=(-1, 0, 0), z_dir=(0, 0, -1))):
        with Locations((-38.7, 36)):
            Circle(SKETCH42_R)
        with Locations((-6.7, 36)):
            Circle(SKETCH42_R)
    extrude(amount=-CUT_EXTRUDE18_DEPTH, mode=Mode.SUBTRACT)

    # Sketch43 → Boss-Extrude18 (add)
    with BuildSketch(Plane.XY.offset(30.85)):
        with Locations((5.775, 5.25)):
            Rectangle(SKETCH43_W, SKETCH43_H)
        with Locations((39.625, 5.25)):
            Rectangle(SKETCH43_W, SKETCH43_H)
    extrude(amount=-BOSS_EXTRUDE18_DEPTH)

    # Sketch44 → Cut-Extrude19 (cut)
    with BuildSketch(Plane.XY.offset(30.85)):
        with Locations((6.7, 4)):
            Circle(SKETCH44_R)
        with Locations((38.7, 4)):
            Circle(SKETCH44_R)
    extrude(amount=-CUT_EXTRUDE19_DEPTH, mode=Mode.SUBTRACT)

    # Sketch45 → Cut-Extrude20 (cut, two sides: drawn at the far end of the back side and taken through both)
    with BuildSketch(Plane(origin=(0, 0, 22.85), x_dir=(-1, 0, 0), z_dir=(0, 0, -1)).offset(-CUT_EXTRUDE20_DEPTH_BACK)):
        Polygon((-40.374315781, 6.9), (-42.048631561, 4), (-40.374315781, 1.1), (-37.025684219, 1.1), (-35.351368439, 4), (-37.025684219, 6.9), align=None)
        Polygon((-8.374315781, 6.9), (-10.048631561, 4), (-8.374315781, 1.1), (-5.025684219, 1.1), (-3.351368439, 4), (-5.025684219, 6.9), align=None)
    extrude(amount=CUT_EXTRUDE20_DEPTH + CUT_EXTRUDE20_DEPTH_BACK, mode=Mode.SUBTRACT)

    # Sketch46 → Cut-Extrude21 (cut, through all)
    with BuildSketch(Plane(origin=(0, 0, 22.85), x_dir=(-1, 0, 0), z_dir=(0, 0, -1))):
        Polygon((-36.736751346, 8.5), (-33.85, 3.5), (-33.85, 8.5), align=None)
        Polygon((-11.55, 8.5), (-8.663248654, 8.5), (-11.55, 3.5), align=None)
    extrude(amount=-CUT_EXTRUDE21_DEPTH, mode=Mode.SUBTRACT)

    # Sketch47 → Cut-Extrude22 (cut)
    with BuildSketch(Plane.XZ.offset(-27.5)):
        with Locations((10.2, 22.925)):
            Rectangle(SKETCH47_W, SKETCH47_H)
        with Locations((35.2, 22.925)):
            Rectangle(SKETCH47_W, SKETCH47_H)
    extrude(amount=-CUT_EXTRUDE22_DEPTH, mode=Mode.SUBTRACT)

    # Fillet11
    fillet11_edges = [part.edges().sort_by_distance(p)[0] for p in [
        (10.2, 27.5, 15),
        (35.2, 27.5, 15),
        (39.7, 27.5, 22.925),
        (5.7, 27.5, 22.925),
    ]]
    fillet(fillet11_edges, radius=FILLET11_R - 0.0001)  # a hair under: the kernel refuses the full size

    # Chamfer7
    # the kernel refuses this chamfer: 1 mm, written as the material it takes off along each edge
    with BuildSketch(Plane(origin=(14.121682988, 2, 15.85), x_dir=(0, 0, 1), z_dir=(-1, 0, 0))) as chamfer7_piece_1_section:
        Polygon((CHAMFER7_SIZE, 0), (0, -CHAMFER7_SIZE), (0, 0), align=None)
    chamfer7_piece_1 = extrude(amount=6.876506625, mode=Mode.PRIVATE)
    chamfer7_piece_1 = chamfer7_piece_1 & Plane(origin=(12.7, 3.5, 15.85), x_dir=(-1, 0, 0), z_dir=(0, 0, 1)) * Cylinder(3.25, 18, mode=Mode.PRIVATE)
    add(chamfer7_piece_1, mode=Mode.SUBTRACT)
    with BuildSketch(Plane(origin=(38.154823637, 2, 15.85), x_dir=(0, 0, 1), z_dir=(-1, 0, 0))) as chamfer7_piece_2_section:
        Polygon((CHAMFER7_SIZE, 0), (0, -CHAMFER7_SIZE), (0, 0), align=None)
    chamfer7_piece_2 = extrude(amount=6.876506625, mode=Mode.PRIVATE)
    chamfer7_piece_2 = chamfer7_piece_2 & Plane(origin=(32.7, 3.5, 15.85), x_dir=(-1, 0, 0), z_dir=(0, 0, 1)) * Cylinder(3.25, 18, mode=Mode.PRIVATE)
    add(chamfer7_piece_2, mode=Mode.SUBTRACT)
    with BuildSketch(Plane(origin=(33.934385989, 2, 17.85), x_dir=(0, 0, -1), z_dir=(1, 0, 0))) as chamfer7_piece_3_section:
        Polygon((CHAMFER7_SIZE, 0), (0, -CHAMFER7_SIZE), (0, 0), align=None)
    chamfer7_piece_3 = extrude(amount=9.531228022, mode=Mode.PRIVATE)
    chamfer7_piece_3 = split(chamfer7_piece_3, bisect_by=Plane(origin=(35.86314823, 3.113571399, 17.85), z_dir=(0.8660254037844388, 0.4999999999999997, 0)), keep=Keep.TOP, mode=Mode.PRIVATE)
    chamfer7_piece_3 = split(chamfer7_piece_3, bisect_by=Plane(origin=(39.154044764, -1.013571399, 17.85), z_dir=(-0.8660254037844384, 0.5000000000000007, 0)), keep=Keep.TOP, mode=Mode.PRIVATE)
    chamfer7_piece_3 = split(chamfer7_piece_3, bisect_by=Plane(origin=(33.934385989, 1.1, 17.85), z_dir=(0, 1, 0)), keep=Keep.TOP, mode=Mode.PRIVATE)
    add(chamfer7_piece_3, mode=Mode.SUBTRACT)
    with BuildSketch(Plane(origin=(1.934385989, 2, 17.85), x_dir=(0, 0, -1), z_dir=(1, 0, 0))) as chamfer7_piece_4_section:
        Polygon((CHAMFER7_SIZE, 0), (0, -CHAMFER7_SIZE), (0, 0), align=None)
    chamfer7_piece_4 = extrude(amount=9.531228022, mode=Mode.PRIVATE)
    chamfer7_piece_4 = split(chamfer7_piece_4, bisect_by=Plane(origin=(3.86314823, 3.113571399, 17.85), z_dir=(0.8660254037844382, 0.5000000000000009, 0)), keep=Keep.TOP, mode=Mode.PRIVATE)
    chamfer7_piece_4 = split(chamfer7_piece_4, bisect_by=Plane(origin=(1.934385989, 1.1, 17.85), z_dir=(0, 1, 0)), keep=Keep.TOP, mode=Mode.PRIVATE)
    chamfer7_piece_4 = split(chamfer7_piece_4, bisect_by=Plane(origin=(7.154044764, -1.013571399, 17.85), z_dir=(-0.8660254037844392, 0.49999999999999906, 0)), keep=Keep.TOP, mode=Mode.PRIVATE)
    add(chamfer7_piece_4, mode=Mode.SUBTRACT)


solid = part.part
